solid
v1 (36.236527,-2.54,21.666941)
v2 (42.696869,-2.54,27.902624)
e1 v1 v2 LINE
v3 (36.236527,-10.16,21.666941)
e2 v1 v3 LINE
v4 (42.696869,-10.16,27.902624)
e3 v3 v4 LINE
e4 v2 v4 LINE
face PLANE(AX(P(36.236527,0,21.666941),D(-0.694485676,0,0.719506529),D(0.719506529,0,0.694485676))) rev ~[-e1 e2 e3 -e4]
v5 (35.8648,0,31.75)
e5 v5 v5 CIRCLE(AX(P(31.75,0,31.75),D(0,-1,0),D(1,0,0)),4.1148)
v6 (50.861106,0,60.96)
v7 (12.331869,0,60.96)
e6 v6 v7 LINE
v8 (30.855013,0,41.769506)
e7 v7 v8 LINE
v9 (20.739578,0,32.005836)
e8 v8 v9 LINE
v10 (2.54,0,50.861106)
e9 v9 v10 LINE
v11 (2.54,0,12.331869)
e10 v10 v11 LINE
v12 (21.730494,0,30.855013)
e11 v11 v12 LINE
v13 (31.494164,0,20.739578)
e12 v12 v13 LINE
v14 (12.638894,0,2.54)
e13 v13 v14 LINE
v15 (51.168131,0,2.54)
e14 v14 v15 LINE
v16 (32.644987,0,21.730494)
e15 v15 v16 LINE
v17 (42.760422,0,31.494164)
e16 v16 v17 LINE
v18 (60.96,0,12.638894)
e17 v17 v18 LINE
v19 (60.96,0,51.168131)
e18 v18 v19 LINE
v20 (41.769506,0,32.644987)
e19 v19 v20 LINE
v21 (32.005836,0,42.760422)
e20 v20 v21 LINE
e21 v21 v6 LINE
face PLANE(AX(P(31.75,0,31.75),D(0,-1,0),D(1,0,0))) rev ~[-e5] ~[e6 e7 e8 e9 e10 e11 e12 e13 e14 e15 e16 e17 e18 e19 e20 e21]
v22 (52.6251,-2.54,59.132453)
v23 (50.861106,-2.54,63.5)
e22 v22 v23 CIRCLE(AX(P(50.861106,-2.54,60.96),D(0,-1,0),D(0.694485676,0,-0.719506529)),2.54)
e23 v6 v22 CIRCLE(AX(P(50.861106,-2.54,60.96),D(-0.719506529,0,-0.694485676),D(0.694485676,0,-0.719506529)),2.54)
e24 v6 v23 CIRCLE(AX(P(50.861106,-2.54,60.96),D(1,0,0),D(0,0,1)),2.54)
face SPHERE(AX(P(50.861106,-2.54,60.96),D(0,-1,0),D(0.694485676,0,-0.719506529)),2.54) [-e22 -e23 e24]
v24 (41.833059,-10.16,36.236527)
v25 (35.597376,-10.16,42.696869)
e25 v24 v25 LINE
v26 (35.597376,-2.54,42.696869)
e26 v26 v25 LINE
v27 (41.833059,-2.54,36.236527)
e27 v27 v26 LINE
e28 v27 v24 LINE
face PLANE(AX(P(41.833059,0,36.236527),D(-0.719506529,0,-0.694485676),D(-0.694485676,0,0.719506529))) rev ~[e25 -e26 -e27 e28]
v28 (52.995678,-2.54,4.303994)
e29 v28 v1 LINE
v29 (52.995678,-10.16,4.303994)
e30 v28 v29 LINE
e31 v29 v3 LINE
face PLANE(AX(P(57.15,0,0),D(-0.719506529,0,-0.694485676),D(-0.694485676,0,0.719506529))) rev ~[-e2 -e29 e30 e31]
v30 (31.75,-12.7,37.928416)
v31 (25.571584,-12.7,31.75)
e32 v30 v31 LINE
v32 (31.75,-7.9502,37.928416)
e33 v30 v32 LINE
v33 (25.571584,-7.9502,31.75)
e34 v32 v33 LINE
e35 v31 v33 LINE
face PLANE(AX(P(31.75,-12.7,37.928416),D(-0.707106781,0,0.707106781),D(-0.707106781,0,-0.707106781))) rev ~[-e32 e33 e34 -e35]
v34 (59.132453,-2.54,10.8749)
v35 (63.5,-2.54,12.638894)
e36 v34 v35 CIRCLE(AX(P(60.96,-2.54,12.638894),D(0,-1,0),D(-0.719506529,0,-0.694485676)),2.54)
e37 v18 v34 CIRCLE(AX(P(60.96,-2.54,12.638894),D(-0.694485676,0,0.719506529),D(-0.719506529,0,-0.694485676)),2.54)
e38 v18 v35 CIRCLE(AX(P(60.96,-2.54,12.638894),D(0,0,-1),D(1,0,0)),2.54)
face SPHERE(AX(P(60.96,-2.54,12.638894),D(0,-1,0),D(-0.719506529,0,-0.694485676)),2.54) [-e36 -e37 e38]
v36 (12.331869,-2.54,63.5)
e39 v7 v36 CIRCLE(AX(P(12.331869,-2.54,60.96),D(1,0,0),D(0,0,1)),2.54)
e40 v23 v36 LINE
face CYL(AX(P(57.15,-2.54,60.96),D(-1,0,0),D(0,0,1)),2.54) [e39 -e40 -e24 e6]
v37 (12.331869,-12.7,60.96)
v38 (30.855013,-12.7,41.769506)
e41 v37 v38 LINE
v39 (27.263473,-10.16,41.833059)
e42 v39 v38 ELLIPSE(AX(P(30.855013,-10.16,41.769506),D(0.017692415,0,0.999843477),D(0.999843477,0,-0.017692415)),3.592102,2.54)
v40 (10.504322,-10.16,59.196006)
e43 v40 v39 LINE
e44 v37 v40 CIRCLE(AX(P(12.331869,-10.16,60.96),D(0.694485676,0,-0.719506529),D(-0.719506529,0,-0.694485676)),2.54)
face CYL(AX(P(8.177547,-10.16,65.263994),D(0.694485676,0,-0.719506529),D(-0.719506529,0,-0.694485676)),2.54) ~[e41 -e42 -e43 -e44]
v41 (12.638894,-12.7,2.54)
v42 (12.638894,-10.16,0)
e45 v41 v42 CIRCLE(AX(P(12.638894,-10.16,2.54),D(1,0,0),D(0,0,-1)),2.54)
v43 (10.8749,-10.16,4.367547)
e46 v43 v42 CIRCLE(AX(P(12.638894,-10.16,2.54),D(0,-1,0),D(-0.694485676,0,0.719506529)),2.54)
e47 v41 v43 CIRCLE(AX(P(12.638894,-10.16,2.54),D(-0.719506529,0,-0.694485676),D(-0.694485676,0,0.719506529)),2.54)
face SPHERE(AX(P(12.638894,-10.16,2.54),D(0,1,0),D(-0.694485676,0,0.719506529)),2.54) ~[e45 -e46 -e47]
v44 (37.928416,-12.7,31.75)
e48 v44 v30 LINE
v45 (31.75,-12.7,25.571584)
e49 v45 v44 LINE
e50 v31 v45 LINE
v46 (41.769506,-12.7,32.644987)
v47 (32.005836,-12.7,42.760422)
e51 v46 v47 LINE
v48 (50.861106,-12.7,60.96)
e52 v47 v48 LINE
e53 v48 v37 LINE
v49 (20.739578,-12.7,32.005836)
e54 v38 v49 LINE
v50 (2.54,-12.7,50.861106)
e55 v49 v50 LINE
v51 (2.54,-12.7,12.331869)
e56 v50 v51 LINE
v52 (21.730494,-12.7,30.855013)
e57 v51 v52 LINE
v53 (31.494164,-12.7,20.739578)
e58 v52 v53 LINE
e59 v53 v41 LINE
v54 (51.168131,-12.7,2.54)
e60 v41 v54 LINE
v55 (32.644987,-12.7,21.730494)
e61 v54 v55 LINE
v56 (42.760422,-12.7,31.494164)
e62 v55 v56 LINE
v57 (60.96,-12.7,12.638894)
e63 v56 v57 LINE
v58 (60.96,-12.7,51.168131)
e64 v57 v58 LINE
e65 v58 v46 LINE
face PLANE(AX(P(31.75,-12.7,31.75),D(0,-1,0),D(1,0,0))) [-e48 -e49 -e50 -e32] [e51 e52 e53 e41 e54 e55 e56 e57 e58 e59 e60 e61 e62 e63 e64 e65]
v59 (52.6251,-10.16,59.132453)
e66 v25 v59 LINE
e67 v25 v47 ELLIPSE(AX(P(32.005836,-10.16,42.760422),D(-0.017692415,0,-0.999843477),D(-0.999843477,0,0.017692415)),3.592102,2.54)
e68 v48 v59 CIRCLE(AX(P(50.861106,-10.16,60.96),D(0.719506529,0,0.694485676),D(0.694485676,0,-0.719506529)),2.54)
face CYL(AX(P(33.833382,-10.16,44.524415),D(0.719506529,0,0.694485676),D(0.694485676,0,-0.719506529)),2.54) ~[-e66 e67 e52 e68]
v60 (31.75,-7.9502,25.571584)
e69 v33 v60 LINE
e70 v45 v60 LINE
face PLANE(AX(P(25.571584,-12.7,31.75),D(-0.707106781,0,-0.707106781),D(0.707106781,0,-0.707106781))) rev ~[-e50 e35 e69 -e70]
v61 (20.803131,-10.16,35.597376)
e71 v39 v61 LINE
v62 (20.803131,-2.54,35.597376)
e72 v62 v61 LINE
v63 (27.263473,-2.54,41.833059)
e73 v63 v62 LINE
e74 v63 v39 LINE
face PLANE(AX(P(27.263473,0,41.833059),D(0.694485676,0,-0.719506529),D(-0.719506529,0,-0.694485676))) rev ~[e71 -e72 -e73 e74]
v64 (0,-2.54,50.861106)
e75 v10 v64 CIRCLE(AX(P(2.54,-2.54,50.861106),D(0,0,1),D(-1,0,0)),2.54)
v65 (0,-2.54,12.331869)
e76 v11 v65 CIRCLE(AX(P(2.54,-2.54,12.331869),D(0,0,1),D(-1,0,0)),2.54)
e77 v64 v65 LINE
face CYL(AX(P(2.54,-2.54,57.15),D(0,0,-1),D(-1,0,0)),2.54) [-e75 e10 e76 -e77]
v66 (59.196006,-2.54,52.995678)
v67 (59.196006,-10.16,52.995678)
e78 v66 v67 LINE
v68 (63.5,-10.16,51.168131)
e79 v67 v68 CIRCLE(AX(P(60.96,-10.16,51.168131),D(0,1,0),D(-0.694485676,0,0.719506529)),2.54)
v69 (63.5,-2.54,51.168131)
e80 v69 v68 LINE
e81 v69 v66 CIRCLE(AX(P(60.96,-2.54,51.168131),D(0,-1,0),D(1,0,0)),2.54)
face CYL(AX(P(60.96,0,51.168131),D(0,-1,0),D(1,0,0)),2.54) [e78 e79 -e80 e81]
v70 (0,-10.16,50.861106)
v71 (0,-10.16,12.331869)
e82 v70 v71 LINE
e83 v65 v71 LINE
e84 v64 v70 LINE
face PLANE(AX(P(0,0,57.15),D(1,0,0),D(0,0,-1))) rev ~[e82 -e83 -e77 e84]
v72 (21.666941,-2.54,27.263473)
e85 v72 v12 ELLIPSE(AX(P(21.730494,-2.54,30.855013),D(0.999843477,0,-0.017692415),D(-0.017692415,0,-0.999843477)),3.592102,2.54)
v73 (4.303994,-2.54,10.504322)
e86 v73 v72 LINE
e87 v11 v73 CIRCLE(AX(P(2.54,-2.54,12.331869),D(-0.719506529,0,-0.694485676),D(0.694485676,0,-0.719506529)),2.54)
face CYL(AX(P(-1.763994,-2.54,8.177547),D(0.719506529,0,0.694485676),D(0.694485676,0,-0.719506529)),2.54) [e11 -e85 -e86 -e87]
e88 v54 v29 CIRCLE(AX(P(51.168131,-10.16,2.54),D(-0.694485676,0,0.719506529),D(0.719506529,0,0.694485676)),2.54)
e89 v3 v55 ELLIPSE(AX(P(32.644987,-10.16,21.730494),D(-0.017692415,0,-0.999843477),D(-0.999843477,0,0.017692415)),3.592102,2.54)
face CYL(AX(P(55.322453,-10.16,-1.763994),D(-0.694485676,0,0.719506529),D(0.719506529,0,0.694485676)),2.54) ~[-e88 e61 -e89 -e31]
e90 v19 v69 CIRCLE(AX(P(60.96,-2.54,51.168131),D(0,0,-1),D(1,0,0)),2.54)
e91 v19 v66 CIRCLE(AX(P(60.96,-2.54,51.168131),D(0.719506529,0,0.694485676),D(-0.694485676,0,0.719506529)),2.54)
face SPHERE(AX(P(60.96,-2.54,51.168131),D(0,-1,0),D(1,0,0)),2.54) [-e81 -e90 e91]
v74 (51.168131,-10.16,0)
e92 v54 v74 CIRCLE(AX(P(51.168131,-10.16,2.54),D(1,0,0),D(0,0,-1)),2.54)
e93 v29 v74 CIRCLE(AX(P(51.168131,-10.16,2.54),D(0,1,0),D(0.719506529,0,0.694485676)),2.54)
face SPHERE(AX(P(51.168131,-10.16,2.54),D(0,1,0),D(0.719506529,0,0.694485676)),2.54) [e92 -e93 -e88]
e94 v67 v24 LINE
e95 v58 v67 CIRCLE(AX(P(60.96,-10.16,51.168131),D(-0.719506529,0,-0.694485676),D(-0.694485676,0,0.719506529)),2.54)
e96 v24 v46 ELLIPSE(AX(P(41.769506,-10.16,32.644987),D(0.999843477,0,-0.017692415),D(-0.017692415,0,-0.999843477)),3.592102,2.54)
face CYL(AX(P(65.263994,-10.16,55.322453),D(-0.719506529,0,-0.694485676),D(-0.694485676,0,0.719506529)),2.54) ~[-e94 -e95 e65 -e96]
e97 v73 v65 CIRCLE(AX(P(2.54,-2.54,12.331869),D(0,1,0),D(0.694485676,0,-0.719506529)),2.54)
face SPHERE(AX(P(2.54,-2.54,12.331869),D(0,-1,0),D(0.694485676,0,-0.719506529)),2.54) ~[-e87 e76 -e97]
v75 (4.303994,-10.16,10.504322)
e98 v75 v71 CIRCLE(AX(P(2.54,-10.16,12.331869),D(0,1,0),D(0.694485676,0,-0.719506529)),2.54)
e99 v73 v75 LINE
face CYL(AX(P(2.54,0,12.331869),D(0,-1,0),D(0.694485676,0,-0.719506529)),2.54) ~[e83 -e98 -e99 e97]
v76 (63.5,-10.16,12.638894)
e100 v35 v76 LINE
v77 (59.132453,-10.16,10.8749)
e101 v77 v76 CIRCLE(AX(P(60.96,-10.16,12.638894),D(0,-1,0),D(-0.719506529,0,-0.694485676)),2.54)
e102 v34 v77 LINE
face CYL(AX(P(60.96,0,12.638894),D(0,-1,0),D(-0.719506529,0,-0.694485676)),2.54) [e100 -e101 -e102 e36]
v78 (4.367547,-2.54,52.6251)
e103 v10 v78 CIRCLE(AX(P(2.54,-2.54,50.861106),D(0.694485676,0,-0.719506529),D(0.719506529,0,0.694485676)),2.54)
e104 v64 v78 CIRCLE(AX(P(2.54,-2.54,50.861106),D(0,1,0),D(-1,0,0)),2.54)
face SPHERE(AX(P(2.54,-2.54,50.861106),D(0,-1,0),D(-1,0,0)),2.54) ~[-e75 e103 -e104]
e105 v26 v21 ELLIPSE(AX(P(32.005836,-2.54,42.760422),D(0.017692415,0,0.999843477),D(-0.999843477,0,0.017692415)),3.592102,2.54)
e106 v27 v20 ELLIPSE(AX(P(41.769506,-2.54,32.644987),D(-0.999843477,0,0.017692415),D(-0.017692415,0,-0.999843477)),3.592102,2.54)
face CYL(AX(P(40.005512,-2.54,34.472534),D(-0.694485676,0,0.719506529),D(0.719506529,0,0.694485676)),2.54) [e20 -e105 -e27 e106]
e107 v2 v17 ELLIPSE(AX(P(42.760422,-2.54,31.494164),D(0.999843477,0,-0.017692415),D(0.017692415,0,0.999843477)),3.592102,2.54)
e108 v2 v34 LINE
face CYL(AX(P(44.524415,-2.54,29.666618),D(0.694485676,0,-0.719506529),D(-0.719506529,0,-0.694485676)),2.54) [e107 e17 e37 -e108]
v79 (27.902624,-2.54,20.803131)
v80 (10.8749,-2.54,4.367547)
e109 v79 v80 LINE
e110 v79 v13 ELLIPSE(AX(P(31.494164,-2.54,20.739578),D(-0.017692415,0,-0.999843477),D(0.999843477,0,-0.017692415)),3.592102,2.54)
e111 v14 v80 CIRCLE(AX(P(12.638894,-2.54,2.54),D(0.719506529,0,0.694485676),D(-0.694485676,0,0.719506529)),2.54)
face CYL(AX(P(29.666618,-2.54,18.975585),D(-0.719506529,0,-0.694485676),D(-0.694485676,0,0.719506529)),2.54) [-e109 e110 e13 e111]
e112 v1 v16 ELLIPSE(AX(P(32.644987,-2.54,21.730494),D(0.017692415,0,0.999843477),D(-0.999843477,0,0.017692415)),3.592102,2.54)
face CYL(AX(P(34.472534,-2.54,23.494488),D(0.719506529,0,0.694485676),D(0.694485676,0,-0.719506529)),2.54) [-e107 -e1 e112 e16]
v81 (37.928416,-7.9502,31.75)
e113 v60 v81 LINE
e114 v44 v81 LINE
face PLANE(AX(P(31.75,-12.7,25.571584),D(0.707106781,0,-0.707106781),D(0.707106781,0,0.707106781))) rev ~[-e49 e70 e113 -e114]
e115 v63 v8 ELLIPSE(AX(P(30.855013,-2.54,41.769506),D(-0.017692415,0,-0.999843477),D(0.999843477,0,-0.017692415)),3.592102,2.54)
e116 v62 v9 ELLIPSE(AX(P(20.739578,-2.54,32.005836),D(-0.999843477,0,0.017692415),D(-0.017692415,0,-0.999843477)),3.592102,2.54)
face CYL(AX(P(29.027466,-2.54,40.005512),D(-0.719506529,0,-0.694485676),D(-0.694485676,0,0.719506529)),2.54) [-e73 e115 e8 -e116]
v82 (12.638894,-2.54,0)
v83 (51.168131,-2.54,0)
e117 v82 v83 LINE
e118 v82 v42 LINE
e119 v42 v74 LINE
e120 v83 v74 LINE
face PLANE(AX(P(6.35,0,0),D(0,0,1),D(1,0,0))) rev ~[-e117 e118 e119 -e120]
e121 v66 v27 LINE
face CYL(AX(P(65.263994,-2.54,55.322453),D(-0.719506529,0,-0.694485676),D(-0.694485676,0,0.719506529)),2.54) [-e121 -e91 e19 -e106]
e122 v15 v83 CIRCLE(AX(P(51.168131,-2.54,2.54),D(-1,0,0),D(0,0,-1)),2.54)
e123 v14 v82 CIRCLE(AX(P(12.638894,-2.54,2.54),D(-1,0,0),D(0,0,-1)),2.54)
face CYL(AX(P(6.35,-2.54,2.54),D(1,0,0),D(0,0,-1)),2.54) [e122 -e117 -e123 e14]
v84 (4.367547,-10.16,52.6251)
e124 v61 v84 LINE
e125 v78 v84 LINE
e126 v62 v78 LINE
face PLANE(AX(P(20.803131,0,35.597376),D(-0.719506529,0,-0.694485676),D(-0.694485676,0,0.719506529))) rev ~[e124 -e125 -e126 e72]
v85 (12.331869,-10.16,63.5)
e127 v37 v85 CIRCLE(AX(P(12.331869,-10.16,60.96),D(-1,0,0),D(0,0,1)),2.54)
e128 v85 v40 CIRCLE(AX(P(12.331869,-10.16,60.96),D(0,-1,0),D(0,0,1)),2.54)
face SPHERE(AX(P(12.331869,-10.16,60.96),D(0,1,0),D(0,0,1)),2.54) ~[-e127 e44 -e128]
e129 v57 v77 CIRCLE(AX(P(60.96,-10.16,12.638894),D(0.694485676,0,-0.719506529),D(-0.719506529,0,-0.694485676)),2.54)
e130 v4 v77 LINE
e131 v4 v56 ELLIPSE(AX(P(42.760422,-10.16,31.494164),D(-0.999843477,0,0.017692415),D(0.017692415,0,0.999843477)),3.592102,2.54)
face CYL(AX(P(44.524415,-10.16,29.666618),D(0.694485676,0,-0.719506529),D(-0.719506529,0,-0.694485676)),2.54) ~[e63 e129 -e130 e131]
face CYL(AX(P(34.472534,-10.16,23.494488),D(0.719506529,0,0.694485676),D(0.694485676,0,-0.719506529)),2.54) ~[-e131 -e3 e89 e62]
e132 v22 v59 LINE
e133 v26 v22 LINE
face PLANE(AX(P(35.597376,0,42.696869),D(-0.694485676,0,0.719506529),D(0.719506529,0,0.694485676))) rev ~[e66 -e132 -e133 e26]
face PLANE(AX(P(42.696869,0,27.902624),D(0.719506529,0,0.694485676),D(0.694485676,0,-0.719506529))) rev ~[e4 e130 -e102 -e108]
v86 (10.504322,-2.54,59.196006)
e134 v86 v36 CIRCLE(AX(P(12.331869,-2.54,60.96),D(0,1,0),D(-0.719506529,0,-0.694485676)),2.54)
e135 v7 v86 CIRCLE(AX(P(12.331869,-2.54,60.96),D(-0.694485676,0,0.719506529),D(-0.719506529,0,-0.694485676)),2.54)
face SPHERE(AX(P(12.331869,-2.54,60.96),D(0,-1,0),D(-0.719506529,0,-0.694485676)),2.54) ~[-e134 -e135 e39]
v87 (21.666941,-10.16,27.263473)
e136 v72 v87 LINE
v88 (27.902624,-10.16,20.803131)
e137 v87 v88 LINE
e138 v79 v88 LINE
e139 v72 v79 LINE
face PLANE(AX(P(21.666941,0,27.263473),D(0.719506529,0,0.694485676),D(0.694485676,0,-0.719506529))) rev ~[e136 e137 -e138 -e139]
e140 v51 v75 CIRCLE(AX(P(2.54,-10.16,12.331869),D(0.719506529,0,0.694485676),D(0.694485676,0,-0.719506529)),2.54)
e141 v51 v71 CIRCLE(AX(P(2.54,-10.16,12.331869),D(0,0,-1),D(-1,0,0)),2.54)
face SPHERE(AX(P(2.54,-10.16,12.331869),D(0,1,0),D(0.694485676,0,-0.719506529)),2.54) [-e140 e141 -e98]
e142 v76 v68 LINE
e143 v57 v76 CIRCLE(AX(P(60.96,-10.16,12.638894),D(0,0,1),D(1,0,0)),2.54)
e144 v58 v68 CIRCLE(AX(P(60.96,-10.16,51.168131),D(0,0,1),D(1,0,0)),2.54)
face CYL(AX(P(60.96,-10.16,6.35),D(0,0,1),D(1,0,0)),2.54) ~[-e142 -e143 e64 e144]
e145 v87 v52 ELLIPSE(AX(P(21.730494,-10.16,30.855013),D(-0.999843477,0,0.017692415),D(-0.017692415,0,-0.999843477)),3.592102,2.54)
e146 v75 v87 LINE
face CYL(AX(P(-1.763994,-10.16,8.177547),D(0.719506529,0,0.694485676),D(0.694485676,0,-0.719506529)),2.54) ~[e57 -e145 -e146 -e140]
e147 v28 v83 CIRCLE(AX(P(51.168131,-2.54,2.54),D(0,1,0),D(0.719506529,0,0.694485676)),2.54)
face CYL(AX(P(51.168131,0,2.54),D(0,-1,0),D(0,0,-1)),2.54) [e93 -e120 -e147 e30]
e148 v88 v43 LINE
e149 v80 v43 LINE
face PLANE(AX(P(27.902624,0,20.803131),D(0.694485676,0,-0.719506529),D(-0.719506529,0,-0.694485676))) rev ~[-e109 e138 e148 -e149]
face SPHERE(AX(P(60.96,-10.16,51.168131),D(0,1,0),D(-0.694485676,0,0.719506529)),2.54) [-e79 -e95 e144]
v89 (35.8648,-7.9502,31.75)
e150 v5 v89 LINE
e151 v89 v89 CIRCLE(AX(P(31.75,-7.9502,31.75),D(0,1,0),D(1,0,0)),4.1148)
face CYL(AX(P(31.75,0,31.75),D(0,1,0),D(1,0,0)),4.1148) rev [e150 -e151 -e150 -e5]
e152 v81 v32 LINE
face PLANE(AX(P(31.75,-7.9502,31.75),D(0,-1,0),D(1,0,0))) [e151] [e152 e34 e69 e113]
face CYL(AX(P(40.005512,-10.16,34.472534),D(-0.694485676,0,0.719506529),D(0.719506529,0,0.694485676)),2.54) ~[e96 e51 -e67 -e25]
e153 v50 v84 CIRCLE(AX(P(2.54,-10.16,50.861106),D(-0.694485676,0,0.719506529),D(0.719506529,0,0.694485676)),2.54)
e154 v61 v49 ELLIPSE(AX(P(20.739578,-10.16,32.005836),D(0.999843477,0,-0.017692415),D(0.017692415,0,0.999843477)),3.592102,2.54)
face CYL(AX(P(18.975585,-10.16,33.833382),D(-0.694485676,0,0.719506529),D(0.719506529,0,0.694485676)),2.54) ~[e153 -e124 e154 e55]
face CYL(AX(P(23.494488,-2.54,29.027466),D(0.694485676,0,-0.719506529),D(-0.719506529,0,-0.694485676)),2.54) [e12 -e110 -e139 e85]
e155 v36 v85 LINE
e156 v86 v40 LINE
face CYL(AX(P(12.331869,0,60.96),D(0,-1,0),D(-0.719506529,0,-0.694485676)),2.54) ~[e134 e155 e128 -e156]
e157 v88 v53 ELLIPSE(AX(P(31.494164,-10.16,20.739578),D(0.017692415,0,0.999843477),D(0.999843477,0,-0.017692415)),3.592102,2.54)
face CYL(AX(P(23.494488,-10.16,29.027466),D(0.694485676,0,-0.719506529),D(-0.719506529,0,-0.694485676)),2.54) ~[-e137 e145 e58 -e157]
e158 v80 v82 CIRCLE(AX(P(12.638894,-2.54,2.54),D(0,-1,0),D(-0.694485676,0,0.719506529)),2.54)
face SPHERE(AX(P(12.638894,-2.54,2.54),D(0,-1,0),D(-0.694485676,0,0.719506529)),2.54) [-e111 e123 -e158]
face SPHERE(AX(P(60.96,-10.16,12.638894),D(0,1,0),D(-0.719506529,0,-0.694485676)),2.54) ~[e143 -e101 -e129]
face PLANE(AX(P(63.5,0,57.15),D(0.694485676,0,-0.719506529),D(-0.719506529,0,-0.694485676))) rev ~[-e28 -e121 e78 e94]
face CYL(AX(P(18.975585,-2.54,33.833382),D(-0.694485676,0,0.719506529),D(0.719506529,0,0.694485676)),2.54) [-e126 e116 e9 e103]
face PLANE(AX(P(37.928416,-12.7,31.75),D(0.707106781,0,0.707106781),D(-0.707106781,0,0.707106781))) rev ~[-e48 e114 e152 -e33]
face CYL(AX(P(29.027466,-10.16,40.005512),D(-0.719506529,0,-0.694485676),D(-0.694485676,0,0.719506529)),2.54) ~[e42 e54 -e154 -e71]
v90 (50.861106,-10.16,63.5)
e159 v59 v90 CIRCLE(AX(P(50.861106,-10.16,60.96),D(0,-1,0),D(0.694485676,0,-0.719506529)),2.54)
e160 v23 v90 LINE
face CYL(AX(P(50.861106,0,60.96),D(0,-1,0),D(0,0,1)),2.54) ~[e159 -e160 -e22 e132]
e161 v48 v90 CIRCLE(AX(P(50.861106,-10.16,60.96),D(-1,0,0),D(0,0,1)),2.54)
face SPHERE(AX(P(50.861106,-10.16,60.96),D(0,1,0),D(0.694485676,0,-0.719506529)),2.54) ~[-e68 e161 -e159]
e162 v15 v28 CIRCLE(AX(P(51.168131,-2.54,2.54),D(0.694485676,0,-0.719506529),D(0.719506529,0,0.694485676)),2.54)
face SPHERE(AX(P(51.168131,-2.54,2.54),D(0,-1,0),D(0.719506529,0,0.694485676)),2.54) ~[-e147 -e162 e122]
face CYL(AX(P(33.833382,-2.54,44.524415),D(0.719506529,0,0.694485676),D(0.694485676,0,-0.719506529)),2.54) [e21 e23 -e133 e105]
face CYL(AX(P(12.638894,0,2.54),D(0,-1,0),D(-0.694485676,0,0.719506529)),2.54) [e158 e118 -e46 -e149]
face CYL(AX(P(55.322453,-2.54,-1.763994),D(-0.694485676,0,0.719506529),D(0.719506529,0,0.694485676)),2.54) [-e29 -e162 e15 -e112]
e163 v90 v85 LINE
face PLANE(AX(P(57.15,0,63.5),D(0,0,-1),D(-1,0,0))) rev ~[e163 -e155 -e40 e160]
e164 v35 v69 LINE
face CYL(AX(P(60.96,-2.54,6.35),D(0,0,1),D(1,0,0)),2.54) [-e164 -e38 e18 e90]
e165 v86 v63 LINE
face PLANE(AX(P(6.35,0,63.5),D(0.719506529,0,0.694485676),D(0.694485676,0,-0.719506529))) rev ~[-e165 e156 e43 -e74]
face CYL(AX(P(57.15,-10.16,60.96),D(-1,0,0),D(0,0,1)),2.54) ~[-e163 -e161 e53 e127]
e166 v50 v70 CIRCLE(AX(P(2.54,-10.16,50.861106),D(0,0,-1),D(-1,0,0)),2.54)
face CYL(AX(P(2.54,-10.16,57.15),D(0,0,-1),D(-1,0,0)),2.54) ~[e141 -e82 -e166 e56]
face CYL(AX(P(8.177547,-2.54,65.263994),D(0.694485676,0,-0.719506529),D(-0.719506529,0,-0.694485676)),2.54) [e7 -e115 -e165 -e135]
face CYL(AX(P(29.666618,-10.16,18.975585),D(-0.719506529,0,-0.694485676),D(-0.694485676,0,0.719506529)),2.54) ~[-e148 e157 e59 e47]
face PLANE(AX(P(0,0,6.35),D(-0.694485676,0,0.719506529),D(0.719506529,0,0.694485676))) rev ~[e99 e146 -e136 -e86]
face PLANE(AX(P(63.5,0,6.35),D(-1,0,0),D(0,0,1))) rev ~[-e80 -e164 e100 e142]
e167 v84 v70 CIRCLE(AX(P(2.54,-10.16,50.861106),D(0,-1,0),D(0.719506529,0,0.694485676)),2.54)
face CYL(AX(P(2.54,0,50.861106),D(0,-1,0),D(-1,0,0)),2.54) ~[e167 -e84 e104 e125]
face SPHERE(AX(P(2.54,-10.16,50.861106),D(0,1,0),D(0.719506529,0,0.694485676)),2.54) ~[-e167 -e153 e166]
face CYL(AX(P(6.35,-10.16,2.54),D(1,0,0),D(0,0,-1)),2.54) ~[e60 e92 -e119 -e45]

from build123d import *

# Parameters (mm, degrees)
F0_R     = 4.1148
F1_DEPTH = 12.7
F2_R     = 2.54
F5_DEPTH = 4.7498


# Not quite as in the source:
# - two fillets or chamfers of one size are made in one step
# - a feature of the source that left no trace in its solid (it failed there, or was rolled back) is left out
# - a feature names something its author has since deleted; it is built from what else it names


with BuildPart() as f1:
    # F0 (on Front) → F1 (new body)
    with BuildSketch(Plane.XZ):
        Polygon((27.9026240856, 20.8031311891), (6.35, 0), (57.15, 0), (36.2365272497, 21.6669410203), (42.6968688109, 27.9026240856), (63.5, 6.35), (63.5, 57.15), (41.8330589797, 36.2365272497), (35.5973759144, 42.6968688109), (57.15, 63.5), (6.35, 63.5), (27.2634727503, 41.8330589797), (20.8031311891, 35.5973759144), (0, 57.15), (0, 6.35), (21.6669410203, 27.2634727503), align=None)
        with Locations((31.75, 31.75)):
            Circle(F0_R, mode=Mode.SUBTRACT)
    extrude(amount=F1_DEPTH)

    # F2
    f2_edges = [f1.edges().sort_by_distance(p)[0] for p in [
        (31.75, -12.7, 63.5),
        (31.75, 0, 63.5),
        (10.401566, -12.7, 46.373688),
        (63.5, -12.7, 31.75),
        (31.75, -12.7, 0),
        (31.75, 0, 0),
        (0, -12.7, 31.75),
        (16.806736, -12.7, 52.666529),
        (24.033302, -12.7, 38.715217),
        (0, -6.35, 57.15),
        (6.35, -6.35, 63.5),
        (0, 0, 31.75),
        (24.784783, 0, 24.033302),
        (24.784783, -12.7, 24.033302),
        (6.35, -6.35, 0),
        (17.126312, 0, 10.401566),
        (17.126312, -12.7, 10.401566),
        (57.15, -6.35, 0),
        (46.693264, 0, 10.833471),
        (46.693264, -12.7, 10.833471),
        (39.466698, 0, 24.784783),
        (39.466698, -12.7, 24.784783),
        (63.5, -6.35, 6.35),
        (53.098434, 0, 17.126312),
        (53.098434, -12.7, 17.126312),
        (63.5, -6.35, 57.15),
        (63.5, 0, 31.75),
        (52.666529, 0, 46.693264),
        (52.666529, -12.7, 46.693264),
        (38.715217, 0, 39.466698),
        (38.715217, -12.7, 39.466698),
        (57.15, -6.35, 63.5),
        (46.373688, 0, 53.098434),
        (46.373688, -12.7, 53.098434),
        (16.806736, 0, 52.666529),
        (24.033302, 0, 38.715217),
        (10.401566, 0, 46.373688),
        (0, -6.35, 6.35),
        (10.833471, 0, 16.806736),
        (10.833471, -12.7, 16.806736),
    ]]
    fillet(f2_edges, radius=F2_R)

    # F4 (on face) → F5 (cut)
    with BuildSketch(Plane.XZ.offset(12.7)):
        Polygon((31.75, 25.5715837887), (37.9284162113, 31.75), (31.75, 37.9284162113), (25.5715837887, 31.75), align=None)
    extrude(amount=-F5_DEPTH, mode=Mode.SUBTRACT)


solid = f1.part
